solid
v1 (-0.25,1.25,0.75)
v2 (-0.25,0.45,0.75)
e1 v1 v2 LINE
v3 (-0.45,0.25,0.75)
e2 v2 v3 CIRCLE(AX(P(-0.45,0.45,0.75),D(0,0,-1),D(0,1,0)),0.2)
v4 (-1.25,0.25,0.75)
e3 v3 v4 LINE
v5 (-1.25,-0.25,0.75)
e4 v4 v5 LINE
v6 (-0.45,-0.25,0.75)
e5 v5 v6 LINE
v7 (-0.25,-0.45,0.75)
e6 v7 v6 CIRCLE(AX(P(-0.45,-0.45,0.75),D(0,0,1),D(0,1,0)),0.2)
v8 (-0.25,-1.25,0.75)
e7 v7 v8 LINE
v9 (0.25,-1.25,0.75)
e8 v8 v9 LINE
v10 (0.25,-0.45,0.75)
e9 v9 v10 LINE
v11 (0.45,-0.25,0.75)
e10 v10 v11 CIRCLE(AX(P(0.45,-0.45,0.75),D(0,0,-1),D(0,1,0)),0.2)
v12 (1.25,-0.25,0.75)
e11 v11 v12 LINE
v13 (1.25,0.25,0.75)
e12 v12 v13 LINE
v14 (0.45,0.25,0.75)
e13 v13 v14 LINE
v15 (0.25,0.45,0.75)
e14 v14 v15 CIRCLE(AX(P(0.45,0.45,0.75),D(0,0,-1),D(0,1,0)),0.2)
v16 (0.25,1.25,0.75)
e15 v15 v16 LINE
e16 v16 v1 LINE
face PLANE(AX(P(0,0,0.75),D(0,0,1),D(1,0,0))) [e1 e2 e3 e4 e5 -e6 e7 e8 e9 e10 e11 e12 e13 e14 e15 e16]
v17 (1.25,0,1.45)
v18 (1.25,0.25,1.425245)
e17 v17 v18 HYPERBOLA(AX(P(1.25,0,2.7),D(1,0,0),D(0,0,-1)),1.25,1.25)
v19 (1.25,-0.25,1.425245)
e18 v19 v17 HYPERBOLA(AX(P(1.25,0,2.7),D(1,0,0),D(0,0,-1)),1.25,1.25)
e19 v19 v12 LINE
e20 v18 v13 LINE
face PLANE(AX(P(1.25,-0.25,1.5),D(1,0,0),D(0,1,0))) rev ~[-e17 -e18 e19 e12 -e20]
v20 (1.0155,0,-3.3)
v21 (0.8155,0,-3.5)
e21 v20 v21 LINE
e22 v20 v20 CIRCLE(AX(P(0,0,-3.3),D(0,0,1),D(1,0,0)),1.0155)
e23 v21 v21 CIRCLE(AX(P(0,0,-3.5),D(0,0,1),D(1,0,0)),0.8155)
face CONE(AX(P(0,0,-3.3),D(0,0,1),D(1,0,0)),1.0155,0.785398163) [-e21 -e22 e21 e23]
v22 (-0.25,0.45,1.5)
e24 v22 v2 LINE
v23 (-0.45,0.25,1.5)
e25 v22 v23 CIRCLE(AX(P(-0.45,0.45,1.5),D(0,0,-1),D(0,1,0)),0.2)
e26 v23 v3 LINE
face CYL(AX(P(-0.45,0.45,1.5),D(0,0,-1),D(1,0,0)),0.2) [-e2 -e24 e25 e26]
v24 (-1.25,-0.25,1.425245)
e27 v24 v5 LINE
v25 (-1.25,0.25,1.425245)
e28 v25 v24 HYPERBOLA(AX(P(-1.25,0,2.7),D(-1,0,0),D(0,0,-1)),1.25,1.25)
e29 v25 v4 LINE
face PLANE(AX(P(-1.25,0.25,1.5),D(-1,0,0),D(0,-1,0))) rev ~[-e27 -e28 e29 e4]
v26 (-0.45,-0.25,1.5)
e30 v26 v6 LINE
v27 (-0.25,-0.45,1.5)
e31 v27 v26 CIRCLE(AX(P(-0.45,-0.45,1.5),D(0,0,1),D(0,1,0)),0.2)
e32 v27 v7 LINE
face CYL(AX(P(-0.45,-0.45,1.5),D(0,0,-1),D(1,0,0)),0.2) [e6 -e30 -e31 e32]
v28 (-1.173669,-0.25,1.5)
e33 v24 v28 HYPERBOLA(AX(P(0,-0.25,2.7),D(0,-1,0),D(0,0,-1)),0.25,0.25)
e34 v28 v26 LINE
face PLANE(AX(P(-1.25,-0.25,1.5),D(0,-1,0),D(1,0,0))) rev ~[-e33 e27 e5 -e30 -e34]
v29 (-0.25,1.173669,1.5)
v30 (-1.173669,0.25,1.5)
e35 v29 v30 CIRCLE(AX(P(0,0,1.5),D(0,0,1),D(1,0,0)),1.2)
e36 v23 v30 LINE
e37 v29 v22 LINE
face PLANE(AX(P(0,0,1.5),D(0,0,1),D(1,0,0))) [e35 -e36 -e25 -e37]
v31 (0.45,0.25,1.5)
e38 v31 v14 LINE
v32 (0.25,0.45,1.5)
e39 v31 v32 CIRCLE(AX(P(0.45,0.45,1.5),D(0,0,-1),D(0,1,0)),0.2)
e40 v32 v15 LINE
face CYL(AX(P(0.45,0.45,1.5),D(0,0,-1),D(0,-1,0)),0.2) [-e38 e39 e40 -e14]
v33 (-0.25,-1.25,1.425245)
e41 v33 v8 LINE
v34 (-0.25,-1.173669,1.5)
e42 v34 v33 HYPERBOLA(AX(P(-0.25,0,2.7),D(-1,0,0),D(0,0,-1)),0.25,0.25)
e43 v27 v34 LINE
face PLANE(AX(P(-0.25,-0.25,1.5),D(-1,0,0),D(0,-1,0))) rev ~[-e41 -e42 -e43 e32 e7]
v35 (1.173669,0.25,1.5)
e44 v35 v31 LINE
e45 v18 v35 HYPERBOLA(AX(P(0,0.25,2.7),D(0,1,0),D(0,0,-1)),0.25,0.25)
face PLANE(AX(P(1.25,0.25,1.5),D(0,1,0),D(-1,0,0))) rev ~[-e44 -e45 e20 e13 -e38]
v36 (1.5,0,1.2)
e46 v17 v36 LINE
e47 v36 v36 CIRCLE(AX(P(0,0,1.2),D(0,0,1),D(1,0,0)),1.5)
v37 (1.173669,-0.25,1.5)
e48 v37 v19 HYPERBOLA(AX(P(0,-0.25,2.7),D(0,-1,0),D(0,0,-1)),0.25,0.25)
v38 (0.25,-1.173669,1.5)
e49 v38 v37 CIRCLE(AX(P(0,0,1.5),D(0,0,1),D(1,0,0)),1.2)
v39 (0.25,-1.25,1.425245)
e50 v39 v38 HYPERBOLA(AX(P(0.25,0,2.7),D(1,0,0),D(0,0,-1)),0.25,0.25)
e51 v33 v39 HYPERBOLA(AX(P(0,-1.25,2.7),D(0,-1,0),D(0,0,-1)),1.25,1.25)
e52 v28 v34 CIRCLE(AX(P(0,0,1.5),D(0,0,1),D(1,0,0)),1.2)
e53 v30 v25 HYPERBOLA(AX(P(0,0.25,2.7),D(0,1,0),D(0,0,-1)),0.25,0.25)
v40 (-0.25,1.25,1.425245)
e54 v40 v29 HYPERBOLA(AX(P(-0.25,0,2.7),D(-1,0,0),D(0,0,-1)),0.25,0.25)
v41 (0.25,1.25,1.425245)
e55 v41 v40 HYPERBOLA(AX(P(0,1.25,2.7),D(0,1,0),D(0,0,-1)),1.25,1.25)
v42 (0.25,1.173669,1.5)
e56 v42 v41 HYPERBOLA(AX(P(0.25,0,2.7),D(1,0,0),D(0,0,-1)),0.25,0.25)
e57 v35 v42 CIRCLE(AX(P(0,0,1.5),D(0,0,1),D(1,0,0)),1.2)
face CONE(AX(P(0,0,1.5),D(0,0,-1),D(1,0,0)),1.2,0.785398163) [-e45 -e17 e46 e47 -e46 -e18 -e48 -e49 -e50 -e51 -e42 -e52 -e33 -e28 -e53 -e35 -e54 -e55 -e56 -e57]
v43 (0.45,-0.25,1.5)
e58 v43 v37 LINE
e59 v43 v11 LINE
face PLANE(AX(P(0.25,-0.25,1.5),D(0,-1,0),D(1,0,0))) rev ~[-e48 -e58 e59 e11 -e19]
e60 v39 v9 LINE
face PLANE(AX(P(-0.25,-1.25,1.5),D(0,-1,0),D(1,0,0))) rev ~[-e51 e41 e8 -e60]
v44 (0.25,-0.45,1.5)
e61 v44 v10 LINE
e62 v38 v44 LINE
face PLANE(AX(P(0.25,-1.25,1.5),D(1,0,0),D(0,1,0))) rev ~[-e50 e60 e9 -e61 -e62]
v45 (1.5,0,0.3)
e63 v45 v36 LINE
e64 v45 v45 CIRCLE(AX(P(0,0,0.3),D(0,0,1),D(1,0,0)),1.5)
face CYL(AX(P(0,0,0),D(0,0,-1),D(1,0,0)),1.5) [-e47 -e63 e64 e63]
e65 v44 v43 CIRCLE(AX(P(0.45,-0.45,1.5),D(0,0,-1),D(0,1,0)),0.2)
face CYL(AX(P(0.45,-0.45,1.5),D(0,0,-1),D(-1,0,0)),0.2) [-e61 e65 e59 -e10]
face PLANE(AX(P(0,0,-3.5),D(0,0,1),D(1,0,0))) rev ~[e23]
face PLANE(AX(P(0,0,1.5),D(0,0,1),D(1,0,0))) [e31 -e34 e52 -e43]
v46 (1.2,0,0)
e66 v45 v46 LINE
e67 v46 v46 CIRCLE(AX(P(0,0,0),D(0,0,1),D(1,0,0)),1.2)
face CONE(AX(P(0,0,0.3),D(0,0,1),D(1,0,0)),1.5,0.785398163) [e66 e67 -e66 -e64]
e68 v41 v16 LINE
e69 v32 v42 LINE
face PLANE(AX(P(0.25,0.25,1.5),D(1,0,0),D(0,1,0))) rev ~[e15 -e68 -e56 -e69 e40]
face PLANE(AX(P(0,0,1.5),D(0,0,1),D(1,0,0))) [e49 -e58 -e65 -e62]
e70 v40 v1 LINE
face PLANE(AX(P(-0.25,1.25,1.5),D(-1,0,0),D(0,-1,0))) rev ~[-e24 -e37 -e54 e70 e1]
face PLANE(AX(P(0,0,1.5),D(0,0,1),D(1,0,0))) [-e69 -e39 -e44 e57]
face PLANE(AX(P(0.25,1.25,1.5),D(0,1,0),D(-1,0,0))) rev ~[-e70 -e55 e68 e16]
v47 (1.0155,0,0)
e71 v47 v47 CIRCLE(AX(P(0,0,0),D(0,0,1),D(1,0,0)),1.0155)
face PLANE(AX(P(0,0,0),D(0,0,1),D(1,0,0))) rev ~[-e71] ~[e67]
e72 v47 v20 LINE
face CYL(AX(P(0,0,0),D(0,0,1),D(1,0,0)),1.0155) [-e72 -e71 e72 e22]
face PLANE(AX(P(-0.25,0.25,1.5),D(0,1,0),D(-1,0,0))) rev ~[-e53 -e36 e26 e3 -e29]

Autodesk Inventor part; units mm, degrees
ref_plane "YZ Plane" through (0, 0, 0) normal (1, 0, 0) x (0, 1, 0)
ref_plane "XZ Plane" through (0, 0, 0) normal (0, 1, 0) x (-1, 0, 0)
ref_plane "XY Plane" through (0, 0, 0) normal (0, 0, 1) x (1, 0, 0)
sketch "Esboço1" plane through (0, 0, 0) normal (0, 0, 1) x (1, 0, 0)
  circle A0 centre (0, 0) radius 1.0155
  dimension "d0" = 2.031
extrude "Extrusão1" add sketch "Esboço1" against normal blind 3.5
sketch "Esboço2" plane through (0, 0, 0) normal (0, 0, 1) x (1, 0, 0)
  circle A0 centre (0, 0) radius 1.5
  dimension "d3" = 3
extrude "Extrusão2" add sketch "Esboço2" along normal blind 1.5
sketch "Esboço3" plane through (0, 0, 1.5) normal (0, 0, 1) x (1, 0, 0)
  line L0 (-0.25, -1.25) -> (0.25, -1.25)
  line L1 (0.25, -1.25) -> (0.25, 1.25)
  line L2 (0.25, 1.25) -> (-0.25, 1.25)
  line L3 (-0.25, 1.25) -> (-0.25, -1.25)
  line L4 (-0.25, -1.25) -> (0.25, 1.25) construction
  line L5 (0.25, -1.25) -> (-0.25, 1.25) construction
  line L6 (-1.25, -0.25) -> (1.25, -0.25)
  line L7 (1.25, -0.25) -> (1.25, 0.25)
  line L8 (1.25, 0.25) -> (-1.25, 0.25)
  line L9 (-1.25, 0.25) -> (-1.25, -0.25)
  line L10 (-1.25, -0.25) -> (1.25, 0.25) construction
  line L11 (1.25, -0.25) -> (-1.25, 0.25) construction
  point P0 (0, 0)
  point P1 (-0.25, 0.25)
  point P2 (-0.25, -0.25)
  point P3 (0.25, -0.25)
  point P4 (0.25, 0.25)
  dimension "d6" = 0.5
  dimension "d7" = 2.5
  dimension "d8" = 2.5
  dimension "d9" = 0.5
extrude "Extrusão3" cut sketch "Esboço3" against normal blind 0.75
thread "Rosca1" size "M2.2x0.45" class "6g" standard "ANSI Metric M Profile" full length
fillet "Arredondamento3" radius 0.2 4 edges at (-0.25, 0.25, 1.125) (0.25, 0.25, 1.125) (-0.25, -0.25, 1.125) (0.25, -0.25, 1.125)
chamfer "Chanfro1" distance 0.3 angle 45 2 edges at (-1.5, 0, 1.5) (-1.5, 0, 0)
chamfer "Chanfro2" distance 0.2 angle 45 1 edges at (-1.0155, 0, -3.5)
properties part number "Parafuso 2,031" material "Liga de Nickel-Copper 400"
